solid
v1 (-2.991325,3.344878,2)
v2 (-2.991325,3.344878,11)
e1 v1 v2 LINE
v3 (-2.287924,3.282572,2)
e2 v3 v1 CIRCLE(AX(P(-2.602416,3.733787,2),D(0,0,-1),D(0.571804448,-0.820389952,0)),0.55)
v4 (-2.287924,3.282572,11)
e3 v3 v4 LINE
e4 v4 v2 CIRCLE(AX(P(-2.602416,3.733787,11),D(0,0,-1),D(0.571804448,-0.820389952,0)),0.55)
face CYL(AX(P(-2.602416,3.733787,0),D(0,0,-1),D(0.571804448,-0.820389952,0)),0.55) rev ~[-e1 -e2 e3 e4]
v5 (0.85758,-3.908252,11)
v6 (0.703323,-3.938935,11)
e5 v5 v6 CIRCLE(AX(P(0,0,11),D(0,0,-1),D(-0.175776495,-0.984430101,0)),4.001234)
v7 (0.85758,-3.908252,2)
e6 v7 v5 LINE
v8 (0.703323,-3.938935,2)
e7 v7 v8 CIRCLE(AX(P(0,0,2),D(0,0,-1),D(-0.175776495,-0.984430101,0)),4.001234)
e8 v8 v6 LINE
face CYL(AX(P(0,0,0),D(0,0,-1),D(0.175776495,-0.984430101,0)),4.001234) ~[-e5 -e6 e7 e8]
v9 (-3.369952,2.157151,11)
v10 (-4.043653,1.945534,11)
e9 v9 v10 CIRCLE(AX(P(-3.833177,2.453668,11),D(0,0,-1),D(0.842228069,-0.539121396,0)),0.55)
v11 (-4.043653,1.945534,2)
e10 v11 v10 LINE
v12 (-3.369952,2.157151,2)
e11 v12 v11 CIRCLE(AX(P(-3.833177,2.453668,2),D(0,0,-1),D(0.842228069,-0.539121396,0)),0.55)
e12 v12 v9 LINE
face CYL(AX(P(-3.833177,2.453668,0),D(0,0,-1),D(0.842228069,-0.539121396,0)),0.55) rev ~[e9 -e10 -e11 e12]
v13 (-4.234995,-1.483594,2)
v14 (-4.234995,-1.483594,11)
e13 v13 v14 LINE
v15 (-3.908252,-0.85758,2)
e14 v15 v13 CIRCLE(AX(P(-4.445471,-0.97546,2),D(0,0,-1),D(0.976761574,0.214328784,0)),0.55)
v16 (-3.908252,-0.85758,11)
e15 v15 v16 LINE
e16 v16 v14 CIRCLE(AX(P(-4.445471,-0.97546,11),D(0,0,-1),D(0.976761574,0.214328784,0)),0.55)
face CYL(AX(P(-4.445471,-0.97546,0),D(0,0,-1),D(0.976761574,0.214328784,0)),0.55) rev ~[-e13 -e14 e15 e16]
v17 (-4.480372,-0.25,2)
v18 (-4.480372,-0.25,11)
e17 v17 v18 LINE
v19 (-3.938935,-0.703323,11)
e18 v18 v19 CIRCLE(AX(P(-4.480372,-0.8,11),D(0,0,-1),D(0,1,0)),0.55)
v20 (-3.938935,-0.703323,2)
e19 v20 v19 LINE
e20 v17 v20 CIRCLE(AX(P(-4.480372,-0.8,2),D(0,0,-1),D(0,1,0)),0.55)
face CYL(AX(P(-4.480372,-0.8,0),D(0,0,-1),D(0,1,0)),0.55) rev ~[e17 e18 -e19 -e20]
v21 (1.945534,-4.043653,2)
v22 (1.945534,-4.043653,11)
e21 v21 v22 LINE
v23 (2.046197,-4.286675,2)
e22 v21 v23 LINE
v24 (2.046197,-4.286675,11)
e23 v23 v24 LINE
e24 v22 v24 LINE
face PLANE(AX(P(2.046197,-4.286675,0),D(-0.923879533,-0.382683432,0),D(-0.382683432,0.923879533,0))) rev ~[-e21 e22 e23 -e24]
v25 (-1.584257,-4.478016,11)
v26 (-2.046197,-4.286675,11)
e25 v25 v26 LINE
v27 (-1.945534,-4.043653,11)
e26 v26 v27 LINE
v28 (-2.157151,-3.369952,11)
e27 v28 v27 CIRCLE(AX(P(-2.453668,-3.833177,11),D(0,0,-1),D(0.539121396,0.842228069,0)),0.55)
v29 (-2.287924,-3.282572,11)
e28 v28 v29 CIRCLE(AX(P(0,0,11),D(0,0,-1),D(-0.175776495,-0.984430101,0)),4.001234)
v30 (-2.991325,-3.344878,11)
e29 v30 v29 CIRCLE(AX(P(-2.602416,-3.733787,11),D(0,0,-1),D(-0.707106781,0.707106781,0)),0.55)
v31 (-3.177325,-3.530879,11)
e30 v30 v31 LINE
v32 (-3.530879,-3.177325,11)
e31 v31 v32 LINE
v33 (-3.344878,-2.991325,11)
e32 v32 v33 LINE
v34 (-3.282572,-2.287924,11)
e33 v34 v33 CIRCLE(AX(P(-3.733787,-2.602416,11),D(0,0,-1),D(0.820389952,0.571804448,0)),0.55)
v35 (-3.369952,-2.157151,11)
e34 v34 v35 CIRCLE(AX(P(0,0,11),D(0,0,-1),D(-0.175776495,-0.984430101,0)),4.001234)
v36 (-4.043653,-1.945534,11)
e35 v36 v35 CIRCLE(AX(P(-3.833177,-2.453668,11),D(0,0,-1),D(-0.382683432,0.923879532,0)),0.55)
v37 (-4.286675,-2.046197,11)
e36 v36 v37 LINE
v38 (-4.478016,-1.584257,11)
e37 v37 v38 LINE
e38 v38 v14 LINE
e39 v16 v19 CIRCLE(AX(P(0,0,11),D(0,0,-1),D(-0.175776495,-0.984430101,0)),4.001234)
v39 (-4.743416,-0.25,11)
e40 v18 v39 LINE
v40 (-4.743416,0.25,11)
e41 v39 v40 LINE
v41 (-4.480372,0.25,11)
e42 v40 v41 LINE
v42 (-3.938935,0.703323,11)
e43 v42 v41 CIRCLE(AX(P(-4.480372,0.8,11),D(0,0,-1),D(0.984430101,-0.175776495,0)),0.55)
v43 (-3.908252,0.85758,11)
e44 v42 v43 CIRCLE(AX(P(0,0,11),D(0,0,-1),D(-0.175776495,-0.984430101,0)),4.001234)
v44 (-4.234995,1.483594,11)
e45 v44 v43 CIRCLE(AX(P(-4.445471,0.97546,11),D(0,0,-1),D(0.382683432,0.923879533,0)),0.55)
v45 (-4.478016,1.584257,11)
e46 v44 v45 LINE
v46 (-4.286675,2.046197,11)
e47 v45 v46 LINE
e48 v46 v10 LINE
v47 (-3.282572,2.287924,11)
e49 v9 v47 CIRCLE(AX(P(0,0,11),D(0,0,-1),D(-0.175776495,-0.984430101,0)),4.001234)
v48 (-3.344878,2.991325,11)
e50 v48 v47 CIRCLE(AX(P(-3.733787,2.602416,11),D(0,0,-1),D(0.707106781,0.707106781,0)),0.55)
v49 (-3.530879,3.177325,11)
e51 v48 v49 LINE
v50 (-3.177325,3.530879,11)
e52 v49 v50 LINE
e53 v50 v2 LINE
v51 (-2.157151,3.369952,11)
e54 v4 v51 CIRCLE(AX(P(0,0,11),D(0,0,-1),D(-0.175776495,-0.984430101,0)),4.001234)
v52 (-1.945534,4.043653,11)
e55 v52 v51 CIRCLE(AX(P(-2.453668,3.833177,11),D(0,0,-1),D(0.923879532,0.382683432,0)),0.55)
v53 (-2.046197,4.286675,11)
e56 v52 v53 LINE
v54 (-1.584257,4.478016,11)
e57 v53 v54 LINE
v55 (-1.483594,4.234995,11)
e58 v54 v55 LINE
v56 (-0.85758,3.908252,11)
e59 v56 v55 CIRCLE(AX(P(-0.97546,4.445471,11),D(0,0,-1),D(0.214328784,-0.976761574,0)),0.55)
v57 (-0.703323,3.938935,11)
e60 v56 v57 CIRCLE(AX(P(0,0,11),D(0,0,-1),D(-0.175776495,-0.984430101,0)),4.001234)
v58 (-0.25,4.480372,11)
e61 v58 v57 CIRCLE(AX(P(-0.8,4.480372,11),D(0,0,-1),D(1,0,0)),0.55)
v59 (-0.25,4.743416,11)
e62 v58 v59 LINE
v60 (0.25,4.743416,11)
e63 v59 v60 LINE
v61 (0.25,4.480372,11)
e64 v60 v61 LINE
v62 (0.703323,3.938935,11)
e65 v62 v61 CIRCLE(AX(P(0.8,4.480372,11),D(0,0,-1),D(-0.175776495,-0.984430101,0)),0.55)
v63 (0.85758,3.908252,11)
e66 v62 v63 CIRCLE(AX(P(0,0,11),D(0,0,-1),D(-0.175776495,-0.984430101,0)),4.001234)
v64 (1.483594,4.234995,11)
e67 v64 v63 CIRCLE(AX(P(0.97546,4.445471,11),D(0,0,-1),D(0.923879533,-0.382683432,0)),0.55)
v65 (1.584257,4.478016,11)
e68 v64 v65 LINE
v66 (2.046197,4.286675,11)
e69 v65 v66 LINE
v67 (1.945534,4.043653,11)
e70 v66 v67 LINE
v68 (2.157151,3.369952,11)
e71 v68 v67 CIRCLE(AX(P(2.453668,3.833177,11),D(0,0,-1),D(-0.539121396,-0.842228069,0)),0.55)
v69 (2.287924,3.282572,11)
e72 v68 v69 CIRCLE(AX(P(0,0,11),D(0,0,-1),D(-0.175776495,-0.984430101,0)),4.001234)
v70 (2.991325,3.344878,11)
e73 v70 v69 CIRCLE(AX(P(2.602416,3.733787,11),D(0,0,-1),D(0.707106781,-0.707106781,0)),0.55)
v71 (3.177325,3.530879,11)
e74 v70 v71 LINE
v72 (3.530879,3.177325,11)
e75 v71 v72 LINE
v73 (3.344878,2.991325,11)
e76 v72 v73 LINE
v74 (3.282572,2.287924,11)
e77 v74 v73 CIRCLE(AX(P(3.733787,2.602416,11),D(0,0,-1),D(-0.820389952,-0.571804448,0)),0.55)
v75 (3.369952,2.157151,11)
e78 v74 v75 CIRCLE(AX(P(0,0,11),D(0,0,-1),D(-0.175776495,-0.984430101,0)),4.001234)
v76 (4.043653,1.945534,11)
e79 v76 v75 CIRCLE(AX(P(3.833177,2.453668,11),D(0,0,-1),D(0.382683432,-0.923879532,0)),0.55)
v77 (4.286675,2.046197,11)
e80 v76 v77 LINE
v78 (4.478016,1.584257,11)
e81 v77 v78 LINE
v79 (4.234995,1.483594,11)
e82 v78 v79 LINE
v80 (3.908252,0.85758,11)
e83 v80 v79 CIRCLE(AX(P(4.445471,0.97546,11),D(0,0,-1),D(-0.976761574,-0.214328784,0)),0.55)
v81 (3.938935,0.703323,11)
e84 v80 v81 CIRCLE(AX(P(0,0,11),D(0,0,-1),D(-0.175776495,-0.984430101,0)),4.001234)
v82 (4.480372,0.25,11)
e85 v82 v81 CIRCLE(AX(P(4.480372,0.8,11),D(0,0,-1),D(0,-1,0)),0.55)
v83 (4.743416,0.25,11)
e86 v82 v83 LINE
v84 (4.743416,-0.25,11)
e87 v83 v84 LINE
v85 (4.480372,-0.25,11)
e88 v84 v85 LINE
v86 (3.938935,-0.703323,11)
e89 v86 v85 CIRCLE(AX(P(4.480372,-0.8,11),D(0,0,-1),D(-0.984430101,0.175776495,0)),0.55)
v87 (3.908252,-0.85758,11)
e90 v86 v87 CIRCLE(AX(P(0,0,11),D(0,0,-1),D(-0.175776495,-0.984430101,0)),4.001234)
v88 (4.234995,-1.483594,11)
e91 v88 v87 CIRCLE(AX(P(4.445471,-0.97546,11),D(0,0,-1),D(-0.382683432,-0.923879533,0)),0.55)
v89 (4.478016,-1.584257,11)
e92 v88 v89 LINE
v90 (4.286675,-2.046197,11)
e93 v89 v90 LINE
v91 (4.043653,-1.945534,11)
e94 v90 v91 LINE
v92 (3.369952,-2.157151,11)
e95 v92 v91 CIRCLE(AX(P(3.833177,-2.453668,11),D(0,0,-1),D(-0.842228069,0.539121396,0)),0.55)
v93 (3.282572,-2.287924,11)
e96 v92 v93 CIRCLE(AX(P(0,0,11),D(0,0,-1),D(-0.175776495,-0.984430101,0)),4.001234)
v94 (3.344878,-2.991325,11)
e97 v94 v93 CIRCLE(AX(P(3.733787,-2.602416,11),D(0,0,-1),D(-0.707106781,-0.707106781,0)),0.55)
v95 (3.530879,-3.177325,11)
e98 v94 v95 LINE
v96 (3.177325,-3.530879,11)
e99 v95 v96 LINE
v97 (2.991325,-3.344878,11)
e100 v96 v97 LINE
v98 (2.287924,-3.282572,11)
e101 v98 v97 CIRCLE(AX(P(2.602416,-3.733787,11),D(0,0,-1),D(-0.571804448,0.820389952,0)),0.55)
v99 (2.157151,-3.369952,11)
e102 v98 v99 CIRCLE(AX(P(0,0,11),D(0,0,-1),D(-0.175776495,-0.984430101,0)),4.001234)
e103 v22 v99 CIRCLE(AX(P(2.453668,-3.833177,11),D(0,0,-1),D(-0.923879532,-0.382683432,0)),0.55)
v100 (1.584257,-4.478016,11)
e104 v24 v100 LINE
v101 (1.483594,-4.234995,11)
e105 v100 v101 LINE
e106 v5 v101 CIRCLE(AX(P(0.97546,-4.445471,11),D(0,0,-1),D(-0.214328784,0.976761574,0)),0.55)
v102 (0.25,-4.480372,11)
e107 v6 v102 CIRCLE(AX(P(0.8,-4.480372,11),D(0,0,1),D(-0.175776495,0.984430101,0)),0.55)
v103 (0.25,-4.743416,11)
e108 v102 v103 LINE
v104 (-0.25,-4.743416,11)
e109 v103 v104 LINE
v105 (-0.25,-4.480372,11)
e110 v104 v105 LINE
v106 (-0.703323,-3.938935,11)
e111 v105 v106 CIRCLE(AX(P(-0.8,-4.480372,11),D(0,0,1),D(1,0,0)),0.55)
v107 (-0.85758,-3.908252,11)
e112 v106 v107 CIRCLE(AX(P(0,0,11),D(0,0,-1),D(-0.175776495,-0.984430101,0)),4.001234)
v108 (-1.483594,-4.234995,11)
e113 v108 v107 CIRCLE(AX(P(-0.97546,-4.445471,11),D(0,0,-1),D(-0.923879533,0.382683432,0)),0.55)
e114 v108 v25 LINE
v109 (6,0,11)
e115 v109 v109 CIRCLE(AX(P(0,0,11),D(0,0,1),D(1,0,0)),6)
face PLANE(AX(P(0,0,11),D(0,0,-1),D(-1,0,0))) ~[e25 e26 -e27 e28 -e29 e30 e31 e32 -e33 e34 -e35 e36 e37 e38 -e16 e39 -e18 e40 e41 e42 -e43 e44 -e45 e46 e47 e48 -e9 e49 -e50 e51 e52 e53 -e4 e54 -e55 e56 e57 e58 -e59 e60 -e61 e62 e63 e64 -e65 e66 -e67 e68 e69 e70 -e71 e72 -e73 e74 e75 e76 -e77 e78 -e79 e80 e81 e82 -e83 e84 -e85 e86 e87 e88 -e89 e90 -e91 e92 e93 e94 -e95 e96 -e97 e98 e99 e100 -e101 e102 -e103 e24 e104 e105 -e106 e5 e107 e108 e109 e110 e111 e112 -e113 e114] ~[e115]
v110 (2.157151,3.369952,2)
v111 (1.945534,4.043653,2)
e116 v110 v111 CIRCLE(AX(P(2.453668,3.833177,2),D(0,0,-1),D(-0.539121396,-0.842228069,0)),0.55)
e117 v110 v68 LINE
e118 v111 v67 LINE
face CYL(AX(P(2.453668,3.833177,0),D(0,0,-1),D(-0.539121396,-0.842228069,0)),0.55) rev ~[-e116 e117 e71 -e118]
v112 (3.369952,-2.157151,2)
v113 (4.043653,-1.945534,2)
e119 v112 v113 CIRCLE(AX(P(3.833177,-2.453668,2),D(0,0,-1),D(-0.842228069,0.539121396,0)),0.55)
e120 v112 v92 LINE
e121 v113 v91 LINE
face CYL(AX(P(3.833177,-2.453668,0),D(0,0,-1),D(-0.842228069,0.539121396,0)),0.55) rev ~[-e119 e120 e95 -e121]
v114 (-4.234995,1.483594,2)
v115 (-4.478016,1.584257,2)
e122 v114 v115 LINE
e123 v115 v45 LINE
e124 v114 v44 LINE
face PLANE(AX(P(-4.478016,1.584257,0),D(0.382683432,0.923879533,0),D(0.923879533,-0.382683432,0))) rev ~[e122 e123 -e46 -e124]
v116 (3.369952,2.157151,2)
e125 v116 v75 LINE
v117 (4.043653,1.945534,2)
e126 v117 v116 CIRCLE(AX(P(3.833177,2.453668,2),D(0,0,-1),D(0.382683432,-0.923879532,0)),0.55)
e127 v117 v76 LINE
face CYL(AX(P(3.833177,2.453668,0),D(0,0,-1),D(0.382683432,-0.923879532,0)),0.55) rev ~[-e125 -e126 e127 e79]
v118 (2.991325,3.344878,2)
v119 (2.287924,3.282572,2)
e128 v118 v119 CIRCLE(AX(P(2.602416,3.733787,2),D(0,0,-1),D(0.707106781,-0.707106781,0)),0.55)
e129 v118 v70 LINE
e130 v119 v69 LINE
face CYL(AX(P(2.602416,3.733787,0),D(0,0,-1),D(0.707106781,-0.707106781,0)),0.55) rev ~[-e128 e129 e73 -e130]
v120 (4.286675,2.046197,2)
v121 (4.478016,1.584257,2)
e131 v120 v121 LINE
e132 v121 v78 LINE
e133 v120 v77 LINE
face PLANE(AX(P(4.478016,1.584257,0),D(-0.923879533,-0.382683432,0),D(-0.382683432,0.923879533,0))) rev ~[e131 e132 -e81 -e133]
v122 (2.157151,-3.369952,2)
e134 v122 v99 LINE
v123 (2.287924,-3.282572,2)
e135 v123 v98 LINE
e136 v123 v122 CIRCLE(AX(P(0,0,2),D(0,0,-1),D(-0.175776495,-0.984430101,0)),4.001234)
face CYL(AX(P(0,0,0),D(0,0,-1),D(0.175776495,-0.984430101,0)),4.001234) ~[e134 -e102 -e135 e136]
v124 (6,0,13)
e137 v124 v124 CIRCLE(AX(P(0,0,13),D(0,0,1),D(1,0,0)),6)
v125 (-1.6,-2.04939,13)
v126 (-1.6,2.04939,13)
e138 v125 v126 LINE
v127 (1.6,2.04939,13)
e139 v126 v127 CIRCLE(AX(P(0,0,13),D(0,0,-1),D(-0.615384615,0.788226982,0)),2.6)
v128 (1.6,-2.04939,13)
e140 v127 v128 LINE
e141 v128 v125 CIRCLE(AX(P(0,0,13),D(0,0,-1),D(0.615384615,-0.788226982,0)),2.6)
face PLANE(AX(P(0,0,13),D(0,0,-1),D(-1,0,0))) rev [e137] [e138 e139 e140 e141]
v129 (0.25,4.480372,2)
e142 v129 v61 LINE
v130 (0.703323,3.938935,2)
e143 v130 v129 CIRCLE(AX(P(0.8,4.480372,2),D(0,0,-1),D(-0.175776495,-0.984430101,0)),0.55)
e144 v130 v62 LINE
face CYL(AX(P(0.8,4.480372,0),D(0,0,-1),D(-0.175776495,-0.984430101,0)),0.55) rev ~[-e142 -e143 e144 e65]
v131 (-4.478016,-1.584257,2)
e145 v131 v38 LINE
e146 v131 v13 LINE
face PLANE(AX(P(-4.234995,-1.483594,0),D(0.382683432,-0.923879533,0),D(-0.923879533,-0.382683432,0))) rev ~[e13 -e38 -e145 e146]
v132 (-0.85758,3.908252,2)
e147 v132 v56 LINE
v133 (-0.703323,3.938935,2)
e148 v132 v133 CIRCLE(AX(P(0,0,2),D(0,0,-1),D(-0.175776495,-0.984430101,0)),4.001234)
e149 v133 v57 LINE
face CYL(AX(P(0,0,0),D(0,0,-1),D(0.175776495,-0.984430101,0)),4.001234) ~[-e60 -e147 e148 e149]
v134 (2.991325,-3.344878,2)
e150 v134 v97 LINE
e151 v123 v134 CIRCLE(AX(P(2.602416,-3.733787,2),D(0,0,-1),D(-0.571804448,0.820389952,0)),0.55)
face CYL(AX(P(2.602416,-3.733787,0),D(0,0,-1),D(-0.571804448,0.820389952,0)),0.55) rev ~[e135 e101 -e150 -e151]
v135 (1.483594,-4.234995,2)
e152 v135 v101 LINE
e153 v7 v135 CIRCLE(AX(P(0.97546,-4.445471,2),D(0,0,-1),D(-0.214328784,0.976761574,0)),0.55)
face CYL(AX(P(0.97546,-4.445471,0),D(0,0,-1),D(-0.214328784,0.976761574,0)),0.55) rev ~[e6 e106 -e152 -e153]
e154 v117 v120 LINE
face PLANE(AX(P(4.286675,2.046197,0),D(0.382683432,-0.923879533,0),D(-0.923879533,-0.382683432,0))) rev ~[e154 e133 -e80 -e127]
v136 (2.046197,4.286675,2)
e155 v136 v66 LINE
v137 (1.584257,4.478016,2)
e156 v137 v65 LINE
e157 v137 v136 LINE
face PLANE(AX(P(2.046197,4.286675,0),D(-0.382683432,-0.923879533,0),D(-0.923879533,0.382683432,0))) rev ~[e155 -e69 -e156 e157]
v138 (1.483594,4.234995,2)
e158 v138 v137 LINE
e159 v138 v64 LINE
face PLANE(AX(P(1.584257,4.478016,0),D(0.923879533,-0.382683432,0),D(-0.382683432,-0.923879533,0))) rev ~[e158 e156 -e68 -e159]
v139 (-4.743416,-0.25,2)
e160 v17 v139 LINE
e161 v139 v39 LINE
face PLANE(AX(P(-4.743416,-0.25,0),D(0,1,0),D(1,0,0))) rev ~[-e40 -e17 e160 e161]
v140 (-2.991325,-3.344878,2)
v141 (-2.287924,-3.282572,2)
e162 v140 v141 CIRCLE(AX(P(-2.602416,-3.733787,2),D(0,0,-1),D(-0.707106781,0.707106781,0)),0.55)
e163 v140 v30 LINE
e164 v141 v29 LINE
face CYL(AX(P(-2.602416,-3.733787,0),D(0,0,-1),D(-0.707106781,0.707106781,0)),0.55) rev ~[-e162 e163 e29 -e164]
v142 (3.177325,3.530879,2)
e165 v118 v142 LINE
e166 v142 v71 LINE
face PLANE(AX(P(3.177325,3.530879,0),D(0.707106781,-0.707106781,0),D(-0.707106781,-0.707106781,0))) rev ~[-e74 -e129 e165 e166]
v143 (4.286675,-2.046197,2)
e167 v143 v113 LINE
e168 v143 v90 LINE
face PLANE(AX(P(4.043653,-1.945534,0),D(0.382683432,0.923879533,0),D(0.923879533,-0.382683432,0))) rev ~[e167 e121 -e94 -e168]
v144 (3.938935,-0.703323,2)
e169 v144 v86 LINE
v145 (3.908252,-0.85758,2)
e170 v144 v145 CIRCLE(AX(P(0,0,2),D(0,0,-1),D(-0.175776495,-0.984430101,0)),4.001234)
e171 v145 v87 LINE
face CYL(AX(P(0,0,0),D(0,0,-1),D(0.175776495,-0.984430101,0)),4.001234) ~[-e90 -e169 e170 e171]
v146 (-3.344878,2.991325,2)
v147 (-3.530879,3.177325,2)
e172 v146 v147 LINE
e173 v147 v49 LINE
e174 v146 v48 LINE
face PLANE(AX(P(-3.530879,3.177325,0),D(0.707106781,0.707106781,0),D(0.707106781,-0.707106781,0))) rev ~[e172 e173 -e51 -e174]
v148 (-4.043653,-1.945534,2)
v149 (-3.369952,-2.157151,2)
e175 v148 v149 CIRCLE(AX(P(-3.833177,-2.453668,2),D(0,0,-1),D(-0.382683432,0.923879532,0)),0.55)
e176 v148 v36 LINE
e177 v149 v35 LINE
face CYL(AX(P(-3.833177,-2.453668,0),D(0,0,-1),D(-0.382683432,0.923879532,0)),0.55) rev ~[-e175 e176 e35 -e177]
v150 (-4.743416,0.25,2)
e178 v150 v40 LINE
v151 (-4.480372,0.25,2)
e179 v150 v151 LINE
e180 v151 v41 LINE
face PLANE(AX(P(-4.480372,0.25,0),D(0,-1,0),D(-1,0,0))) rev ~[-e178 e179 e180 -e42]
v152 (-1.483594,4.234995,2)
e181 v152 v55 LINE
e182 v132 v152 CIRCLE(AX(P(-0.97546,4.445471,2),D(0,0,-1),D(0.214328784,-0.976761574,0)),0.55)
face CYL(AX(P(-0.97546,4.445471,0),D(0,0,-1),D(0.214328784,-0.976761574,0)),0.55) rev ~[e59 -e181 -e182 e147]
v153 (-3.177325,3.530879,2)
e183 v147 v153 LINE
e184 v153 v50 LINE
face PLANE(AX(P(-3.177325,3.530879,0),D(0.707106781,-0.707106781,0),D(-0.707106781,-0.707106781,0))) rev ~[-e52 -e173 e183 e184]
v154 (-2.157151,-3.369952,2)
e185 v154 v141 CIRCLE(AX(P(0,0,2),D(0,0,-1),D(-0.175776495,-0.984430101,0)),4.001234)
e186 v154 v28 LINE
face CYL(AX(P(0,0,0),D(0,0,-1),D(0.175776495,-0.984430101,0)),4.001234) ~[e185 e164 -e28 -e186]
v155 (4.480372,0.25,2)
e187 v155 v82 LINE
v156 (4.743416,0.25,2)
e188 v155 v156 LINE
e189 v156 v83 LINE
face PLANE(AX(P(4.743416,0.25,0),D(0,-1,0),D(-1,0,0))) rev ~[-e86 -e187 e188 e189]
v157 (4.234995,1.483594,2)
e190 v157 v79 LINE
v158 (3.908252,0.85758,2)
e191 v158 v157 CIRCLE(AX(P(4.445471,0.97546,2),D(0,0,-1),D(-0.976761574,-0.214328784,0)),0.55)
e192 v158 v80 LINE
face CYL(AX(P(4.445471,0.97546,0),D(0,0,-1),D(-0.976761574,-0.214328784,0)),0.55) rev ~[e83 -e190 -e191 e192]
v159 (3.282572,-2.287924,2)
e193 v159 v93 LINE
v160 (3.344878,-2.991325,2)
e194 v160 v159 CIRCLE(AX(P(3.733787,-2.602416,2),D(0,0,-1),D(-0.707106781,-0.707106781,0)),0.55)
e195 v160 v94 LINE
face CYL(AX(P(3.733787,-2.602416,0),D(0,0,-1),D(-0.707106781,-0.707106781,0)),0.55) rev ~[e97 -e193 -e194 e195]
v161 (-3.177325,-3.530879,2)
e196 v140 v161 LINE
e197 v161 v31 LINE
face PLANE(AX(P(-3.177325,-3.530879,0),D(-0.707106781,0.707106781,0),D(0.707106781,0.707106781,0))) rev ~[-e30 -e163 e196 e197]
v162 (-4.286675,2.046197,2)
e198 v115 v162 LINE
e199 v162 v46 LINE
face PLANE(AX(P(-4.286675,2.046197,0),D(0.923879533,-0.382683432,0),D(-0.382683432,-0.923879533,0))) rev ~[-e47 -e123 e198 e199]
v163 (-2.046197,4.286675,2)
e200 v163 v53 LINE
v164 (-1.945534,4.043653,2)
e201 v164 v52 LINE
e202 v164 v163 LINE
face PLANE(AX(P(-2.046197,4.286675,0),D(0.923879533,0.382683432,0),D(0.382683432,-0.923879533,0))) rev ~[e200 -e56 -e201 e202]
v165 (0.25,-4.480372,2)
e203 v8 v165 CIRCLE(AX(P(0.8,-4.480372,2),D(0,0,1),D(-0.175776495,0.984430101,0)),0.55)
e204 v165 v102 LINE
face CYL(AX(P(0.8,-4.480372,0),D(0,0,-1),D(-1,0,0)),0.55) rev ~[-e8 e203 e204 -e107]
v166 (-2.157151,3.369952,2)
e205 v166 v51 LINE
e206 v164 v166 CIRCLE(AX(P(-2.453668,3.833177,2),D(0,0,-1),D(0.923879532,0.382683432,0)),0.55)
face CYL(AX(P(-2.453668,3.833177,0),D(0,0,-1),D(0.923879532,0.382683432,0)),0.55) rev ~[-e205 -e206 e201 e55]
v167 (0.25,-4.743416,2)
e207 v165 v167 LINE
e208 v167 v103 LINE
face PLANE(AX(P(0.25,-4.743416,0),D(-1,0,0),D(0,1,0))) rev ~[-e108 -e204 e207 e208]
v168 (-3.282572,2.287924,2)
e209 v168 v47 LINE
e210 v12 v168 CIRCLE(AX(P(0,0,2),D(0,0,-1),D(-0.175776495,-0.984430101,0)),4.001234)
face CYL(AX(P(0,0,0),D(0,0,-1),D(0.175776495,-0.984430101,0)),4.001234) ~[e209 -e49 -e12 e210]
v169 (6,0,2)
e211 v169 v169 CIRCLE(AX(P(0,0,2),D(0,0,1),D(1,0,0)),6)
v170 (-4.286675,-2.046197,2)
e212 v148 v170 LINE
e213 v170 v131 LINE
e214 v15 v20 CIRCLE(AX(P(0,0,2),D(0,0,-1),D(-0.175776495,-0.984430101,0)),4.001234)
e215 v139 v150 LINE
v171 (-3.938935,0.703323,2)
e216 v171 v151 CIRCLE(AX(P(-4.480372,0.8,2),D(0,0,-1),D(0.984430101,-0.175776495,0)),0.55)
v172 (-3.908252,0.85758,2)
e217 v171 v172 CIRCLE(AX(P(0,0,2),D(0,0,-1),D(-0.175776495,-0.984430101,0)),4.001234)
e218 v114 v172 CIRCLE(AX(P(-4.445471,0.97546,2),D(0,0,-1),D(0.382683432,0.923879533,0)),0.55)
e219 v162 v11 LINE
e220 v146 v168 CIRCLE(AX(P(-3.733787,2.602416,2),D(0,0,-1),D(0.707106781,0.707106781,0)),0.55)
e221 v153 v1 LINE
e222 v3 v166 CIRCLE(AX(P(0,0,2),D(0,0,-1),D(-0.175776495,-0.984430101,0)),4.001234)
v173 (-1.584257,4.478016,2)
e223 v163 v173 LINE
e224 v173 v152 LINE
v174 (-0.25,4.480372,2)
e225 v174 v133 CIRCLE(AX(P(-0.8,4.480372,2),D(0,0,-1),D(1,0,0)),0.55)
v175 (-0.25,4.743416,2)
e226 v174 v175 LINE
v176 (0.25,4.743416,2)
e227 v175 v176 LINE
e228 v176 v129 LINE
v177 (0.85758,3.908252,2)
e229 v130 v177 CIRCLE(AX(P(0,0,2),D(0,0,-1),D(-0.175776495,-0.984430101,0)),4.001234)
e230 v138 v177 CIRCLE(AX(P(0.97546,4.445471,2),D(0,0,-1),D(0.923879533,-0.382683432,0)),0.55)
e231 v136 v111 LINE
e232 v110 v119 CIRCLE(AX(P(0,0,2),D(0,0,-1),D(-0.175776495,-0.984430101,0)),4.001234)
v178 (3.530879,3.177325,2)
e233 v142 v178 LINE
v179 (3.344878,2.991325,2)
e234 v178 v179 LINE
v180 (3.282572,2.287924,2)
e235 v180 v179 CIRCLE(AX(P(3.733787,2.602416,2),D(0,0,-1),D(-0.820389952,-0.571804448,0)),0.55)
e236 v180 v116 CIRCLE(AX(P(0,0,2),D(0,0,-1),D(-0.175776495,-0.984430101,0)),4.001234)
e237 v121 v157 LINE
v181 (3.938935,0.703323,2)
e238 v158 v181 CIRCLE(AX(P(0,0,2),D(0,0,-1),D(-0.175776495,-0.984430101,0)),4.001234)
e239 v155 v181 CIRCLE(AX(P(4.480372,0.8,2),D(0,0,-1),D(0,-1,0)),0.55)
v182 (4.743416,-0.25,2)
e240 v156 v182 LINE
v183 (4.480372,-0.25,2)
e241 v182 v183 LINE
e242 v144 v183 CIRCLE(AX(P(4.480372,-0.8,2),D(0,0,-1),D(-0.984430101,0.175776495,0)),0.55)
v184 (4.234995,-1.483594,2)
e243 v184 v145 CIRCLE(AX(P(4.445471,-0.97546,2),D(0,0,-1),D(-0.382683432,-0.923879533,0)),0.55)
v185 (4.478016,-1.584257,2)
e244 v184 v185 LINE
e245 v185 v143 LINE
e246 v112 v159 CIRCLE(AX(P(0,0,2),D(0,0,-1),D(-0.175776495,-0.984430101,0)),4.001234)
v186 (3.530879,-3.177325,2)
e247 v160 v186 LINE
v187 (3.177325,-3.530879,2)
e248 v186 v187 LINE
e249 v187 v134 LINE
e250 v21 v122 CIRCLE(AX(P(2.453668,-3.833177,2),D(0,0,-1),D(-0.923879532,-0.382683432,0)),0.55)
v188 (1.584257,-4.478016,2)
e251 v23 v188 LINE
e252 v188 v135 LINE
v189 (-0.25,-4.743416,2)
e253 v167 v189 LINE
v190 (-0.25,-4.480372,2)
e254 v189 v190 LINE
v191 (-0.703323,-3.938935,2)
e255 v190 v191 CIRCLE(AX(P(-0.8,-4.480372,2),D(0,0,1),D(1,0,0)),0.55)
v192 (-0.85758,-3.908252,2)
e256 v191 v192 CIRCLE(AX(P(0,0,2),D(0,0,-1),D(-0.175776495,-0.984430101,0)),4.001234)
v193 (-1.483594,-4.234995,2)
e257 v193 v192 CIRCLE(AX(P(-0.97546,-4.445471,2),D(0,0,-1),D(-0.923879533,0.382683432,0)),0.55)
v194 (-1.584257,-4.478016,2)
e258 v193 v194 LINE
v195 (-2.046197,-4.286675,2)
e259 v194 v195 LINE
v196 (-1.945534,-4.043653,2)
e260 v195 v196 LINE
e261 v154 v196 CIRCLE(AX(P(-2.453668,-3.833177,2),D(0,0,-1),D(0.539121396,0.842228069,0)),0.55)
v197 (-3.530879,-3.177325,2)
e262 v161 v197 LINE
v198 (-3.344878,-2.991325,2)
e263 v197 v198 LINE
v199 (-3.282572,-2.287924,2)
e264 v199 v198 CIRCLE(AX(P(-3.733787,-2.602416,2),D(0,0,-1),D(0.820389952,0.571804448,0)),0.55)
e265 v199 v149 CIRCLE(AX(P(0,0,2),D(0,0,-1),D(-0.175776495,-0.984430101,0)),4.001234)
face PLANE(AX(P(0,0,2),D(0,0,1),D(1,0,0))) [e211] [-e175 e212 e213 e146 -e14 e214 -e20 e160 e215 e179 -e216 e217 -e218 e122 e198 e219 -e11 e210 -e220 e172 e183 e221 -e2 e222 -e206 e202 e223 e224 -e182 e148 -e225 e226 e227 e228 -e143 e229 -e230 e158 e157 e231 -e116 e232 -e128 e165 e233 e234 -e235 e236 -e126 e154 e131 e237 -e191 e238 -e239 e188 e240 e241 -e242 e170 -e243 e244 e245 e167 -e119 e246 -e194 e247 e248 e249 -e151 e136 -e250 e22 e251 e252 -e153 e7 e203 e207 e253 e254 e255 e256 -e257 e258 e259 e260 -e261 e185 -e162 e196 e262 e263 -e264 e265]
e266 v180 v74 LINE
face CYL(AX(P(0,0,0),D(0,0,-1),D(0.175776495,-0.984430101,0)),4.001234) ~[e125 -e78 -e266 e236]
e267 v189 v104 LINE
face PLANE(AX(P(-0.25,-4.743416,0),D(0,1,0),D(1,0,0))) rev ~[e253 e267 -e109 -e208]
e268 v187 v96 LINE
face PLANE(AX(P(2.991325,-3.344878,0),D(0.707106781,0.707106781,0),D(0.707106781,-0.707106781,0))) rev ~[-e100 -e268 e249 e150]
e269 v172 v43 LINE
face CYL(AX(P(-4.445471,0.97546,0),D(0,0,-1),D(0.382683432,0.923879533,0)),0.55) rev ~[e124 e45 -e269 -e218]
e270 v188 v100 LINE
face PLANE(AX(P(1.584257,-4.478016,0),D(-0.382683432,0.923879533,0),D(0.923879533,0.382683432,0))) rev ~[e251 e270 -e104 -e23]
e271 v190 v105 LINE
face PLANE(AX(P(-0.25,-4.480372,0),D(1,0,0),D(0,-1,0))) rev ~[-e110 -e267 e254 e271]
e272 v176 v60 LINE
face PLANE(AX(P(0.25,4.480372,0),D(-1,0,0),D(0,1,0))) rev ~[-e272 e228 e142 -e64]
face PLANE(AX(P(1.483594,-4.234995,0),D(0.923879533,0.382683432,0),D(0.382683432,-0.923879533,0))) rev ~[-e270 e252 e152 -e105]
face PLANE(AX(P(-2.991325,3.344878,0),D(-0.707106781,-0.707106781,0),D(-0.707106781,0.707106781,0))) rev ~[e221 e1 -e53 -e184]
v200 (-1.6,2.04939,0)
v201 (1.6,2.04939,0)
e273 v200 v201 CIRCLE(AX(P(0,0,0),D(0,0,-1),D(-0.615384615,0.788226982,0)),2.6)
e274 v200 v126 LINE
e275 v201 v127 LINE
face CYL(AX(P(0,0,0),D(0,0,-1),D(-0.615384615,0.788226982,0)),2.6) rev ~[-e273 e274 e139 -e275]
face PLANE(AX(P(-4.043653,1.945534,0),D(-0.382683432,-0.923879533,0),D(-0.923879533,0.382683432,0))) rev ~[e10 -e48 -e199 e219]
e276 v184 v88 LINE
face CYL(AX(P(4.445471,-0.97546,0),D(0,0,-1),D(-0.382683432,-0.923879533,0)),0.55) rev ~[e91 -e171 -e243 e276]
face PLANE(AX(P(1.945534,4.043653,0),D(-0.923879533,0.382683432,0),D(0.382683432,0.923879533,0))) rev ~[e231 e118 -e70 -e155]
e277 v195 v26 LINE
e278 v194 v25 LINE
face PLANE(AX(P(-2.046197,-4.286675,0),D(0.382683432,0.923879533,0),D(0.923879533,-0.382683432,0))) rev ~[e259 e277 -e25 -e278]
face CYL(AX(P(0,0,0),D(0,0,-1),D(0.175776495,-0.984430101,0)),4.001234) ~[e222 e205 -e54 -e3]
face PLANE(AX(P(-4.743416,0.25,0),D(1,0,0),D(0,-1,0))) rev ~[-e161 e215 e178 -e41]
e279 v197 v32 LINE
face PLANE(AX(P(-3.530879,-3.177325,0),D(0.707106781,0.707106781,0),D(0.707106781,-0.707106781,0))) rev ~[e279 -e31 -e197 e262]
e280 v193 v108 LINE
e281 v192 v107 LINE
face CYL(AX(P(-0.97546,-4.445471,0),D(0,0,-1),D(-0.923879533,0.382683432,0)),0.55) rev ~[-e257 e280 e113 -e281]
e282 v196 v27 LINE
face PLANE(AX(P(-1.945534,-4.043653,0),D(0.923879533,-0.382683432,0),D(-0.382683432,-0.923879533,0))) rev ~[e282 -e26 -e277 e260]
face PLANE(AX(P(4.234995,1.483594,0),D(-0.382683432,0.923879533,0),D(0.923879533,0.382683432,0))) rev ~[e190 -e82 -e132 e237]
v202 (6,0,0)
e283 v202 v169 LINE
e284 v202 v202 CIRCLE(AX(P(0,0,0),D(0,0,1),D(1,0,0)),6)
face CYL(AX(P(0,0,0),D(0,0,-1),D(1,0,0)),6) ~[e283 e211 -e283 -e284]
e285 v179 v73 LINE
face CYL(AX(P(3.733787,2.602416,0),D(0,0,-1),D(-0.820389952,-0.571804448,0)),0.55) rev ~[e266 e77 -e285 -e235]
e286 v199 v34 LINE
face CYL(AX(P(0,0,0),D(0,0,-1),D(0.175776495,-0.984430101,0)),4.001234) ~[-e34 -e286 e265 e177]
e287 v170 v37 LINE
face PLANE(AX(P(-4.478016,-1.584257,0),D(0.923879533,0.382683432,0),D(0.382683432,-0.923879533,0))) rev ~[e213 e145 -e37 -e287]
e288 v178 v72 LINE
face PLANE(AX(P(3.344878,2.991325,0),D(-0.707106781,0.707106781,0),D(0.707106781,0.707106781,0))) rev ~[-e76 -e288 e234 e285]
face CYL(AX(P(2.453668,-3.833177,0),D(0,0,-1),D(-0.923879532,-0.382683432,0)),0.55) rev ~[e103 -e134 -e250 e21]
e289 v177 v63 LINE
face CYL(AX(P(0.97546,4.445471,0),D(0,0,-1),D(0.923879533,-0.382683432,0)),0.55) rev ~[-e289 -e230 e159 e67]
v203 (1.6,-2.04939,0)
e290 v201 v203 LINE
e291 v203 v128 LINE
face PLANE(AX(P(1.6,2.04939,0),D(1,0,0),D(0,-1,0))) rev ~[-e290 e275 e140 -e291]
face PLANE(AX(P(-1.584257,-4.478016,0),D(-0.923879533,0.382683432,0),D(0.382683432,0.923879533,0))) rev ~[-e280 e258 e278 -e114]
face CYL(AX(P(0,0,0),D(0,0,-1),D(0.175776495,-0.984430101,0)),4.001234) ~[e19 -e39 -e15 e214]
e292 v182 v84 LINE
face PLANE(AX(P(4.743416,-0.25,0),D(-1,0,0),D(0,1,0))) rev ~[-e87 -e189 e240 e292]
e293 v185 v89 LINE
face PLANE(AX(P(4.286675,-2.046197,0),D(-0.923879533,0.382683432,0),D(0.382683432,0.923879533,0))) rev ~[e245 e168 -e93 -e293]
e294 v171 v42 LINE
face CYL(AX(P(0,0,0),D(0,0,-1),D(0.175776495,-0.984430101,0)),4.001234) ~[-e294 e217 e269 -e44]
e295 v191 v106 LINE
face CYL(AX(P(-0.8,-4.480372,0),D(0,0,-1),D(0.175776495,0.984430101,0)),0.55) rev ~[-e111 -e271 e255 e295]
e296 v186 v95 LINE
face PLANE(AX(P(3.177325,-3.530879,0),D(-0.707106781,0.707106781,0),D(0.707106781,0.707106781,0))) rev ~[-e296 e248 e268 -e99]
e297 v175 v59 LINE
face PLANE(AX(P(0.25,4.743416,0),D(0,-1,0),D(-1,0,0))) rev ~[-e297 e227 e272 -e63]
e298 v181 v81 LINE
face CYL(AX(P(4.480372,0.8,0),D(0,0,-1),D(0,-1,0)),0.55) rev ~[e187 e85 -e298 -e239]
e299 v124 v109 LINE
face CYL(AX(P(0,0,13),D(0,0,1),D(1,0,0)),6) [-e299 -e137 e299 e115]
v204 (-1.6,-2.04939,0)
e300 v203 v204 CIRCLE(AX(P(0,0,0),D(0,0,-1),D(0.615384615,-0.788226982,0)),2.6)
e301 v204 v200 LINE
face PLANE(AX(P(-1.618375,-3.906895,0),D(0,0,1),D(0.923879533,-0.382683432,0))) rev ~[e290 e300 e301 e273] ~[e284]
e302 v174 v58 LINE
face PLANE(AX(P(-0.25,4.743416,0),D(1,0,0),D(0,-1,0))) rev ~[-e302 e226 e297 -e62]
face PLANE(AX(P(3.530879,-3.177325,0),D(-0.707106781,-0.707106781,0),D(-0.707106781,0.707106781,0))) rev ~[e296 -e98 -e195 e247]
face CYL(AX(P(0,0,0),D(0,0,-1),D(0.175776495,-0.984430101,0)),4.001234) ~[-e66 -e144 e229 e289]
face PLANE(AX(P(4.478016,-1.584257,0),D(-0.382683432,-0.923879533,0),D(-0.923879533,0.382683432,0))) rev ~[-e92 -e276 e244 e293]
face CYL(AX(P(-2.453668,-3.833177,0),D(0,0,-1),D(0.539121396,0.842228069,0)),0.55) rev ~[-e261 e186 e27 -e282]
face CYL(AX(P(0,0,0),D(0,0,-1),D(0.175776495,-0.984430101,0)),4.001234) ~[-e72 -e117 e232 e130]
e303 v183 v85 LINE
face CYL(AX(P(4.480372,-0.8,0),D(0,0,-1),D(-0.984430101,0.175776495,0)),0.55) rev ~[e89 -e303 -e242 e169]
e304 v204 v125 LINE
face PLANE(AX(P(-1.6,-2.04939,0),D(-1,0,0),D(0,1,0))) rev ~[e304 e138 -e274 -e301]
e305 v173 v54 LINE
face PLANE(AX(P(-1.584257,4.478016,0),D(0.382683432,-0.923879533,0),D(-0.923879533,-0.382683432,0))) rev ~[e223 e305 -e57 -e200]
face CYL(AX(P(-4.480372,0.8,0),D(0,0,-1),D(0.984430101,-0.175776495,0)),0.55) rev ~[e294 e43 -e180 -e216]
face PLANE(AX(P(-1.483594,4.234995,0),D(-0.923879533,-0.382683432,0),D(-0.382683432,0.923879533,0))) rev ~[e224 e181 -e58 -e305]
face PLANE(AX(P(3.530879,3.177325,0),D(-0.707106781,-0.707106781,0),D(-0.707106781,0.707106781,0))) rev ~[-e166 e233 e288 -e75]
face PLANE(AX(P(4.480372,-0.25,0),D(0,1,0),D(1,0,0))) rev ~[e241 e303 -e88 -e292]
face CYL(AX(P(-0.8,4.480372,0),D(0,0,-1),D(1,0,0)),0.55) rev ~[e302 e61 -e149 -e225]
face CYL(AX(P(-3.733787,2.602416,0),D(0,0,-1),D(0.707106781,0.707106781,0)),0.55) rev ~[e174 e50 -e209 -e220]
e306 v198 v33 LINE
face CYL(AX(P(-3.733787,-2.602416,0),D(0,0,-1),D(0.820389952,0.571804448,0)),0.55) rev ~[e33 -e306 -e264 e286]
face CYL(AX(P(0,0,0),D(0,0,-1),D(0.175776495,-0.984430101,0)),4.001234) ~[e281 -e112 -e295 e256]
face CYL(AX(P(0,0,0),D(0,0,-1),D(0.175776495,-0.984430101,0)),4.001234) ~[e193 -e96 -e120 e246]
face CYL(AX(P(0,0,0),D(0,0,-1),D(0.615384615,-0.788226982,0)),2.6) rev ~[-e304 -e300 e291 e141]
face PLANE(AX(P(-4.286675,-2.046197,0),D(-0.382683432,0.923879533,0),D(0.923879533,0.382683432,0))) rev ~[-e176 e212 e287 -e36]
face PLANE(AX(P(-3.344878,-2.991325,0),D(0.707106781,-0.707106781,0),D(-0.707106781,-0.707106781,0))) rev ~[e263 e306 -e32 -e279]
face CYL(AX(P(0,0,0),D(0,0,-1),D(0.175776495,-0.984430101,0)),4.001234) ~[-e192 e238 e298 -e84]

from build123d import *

# Parameters (mm, degrees)
F2_DEPTH        = 13
F1_R            = 6
F3_DEPTH        = 2
F4_DEPTH        = 13
F4_COPIES_COUNT = 16


# Not quite as in the source:
# - a pattern or mirror of a feature is missing from the dataset's text; its kind, count and spacing are read off the source's solid


with BuildPart() as f2:
    # F1 (on Top) → F2 (new body)
    with BuildSketch(Plane.XY):
        with BuildLine():
            ThreePointArc((-0.7033229276, -3.9389354049), (-0.4774392089, -3.9726473625), (-0.25, -3.9934164903))
            Line((-0.25, -3.9934164903), (0.25, -3.9934164903))
            Line((0.25, -3.9934164903), (0.7033229276, -3.9389354049))
            ThreePointArc((0.7033229276, -3.9389354049), (0, 4.0012342177), (-0.7033229276, -3.9389354049))
        make_face()
        with BuildLine():
            ThreePointArc((1.6, 2.0493901532), (2.3366642891, 1.1401754251), (2.6, 0))
            ThreePointArc((2.6, 0), (2.3366642891, -1.1401754251), (1.6, -2.0493901532))
            ThreePointArc((1.6, -2.0493901532), (0, -2.6), (-1.6, -2.0493901532))
            ThreePointArc((-1.6, -2.0493901532), (-2.6, 0), (-1.6, 2.0493901532))
            ThreePointArc((-1.6, 2.0493901532), (0, 2.6), (1.6, 2.0493901532))
        make_face(mode=Mode.SUBTRACT)
        with BuildLine():
            ThreePointArc((1.6, -2.0493901532), (2.3366642891, -1.1401754251), (2.6, 0))
            ThreePointArc((2.6, 0), (2.3366642891, 1.1401754251), (1.6, 2.0493901532))
            Line((1.6, 2.0493901532), (1.6, -2.0493901532))
        make_face()
        with BuildLine():
            Line((-1.6, -2.0493901532), (-1.6, 2.0493901532))
            ThreePointArc((-1.6, 2.0493901532), (-2.6, 0), (-1.6, -2.0493901532))
        make_face()
    extrude(amount=F2_DEPTH)

    # F1 (on Top) → F3 (join)
    with BuildSketch(Plane.XY):
        Circle(F1_R)
        with BuildLine():
            ThreePointArc((-0.25, -4.4803719605), (-0.3782937101, -4.1272943414), (-0.7033229276, -3.9389354049))
            ThreePointArc((-0.7033229276, -3.9389354049), (0, 4.0012342177), (0.7033229276, -3.9389354049))
            ThreePointArc((0.7033229276, -3.9389354049), (0.3782937101, -4.1272943414), (0.25, -4.4803719605))
            Line((0.25, -4.4803719605), (0.25, -4.7434164903))
            Line((0.25, -4.7434164903), (-0.25, -4.7434164903))
            Line((-0.25, -4.7434164903), (-0.25, -4.4803719605))
        make_face(mode=Mode.SUBTRACT)
    f3 = extrude(amount=F3_DEPTH)

    # F3_copies: F3 across plane
    add(f3.mirror(Plane.XY.offset(6.5)))

    # F1 (on Top) → F4 (join)
    with BuildSketch(Plane.XY):
        with BuildLine():
            Line((0.25, -3.9934164903), (-0.25, -3.9934164903))
            ThreePointArc((-0.25, -3.9934164903), (-0.4774392089, -3.9726473625), (-0.7033229276, -3.9389354049))
            ThreePointArc((-0.7033229276, -3.9389354049), (-0.3782937101, -4.1272943414), (-0.25, -4.4803719605))
            Line((-0.25, -4.4803719605), (-0.25, -4.7434164903))
            Line((-0.25, -4.7434164903), (0.25, -4.7434164903))
            Line((0.25, -4.7434164903), (0.25, -4.4803719605))
            ThreePointArc((0.25, -4.4803719605), (0.3782937101, -4.1272943414), (0.7033229276, -3.9389354049))
            Line((0.7033229276, -3.9389354049), (0.25, -3.9934164903))
        make_face()
    f4 = extrude(amount=F4_DEPTH)

    # F4_copies: F4 ×16 about axis
    f4_copies_axis = Axis((0, 0, 0), (0, 0, 1))
    for i in range(1, F4_COPIES_COUNT):
        add(f4.rotate(f4_copies_axis, i * 360 / F4_COPIES_COUNT))


solid = f2.part
